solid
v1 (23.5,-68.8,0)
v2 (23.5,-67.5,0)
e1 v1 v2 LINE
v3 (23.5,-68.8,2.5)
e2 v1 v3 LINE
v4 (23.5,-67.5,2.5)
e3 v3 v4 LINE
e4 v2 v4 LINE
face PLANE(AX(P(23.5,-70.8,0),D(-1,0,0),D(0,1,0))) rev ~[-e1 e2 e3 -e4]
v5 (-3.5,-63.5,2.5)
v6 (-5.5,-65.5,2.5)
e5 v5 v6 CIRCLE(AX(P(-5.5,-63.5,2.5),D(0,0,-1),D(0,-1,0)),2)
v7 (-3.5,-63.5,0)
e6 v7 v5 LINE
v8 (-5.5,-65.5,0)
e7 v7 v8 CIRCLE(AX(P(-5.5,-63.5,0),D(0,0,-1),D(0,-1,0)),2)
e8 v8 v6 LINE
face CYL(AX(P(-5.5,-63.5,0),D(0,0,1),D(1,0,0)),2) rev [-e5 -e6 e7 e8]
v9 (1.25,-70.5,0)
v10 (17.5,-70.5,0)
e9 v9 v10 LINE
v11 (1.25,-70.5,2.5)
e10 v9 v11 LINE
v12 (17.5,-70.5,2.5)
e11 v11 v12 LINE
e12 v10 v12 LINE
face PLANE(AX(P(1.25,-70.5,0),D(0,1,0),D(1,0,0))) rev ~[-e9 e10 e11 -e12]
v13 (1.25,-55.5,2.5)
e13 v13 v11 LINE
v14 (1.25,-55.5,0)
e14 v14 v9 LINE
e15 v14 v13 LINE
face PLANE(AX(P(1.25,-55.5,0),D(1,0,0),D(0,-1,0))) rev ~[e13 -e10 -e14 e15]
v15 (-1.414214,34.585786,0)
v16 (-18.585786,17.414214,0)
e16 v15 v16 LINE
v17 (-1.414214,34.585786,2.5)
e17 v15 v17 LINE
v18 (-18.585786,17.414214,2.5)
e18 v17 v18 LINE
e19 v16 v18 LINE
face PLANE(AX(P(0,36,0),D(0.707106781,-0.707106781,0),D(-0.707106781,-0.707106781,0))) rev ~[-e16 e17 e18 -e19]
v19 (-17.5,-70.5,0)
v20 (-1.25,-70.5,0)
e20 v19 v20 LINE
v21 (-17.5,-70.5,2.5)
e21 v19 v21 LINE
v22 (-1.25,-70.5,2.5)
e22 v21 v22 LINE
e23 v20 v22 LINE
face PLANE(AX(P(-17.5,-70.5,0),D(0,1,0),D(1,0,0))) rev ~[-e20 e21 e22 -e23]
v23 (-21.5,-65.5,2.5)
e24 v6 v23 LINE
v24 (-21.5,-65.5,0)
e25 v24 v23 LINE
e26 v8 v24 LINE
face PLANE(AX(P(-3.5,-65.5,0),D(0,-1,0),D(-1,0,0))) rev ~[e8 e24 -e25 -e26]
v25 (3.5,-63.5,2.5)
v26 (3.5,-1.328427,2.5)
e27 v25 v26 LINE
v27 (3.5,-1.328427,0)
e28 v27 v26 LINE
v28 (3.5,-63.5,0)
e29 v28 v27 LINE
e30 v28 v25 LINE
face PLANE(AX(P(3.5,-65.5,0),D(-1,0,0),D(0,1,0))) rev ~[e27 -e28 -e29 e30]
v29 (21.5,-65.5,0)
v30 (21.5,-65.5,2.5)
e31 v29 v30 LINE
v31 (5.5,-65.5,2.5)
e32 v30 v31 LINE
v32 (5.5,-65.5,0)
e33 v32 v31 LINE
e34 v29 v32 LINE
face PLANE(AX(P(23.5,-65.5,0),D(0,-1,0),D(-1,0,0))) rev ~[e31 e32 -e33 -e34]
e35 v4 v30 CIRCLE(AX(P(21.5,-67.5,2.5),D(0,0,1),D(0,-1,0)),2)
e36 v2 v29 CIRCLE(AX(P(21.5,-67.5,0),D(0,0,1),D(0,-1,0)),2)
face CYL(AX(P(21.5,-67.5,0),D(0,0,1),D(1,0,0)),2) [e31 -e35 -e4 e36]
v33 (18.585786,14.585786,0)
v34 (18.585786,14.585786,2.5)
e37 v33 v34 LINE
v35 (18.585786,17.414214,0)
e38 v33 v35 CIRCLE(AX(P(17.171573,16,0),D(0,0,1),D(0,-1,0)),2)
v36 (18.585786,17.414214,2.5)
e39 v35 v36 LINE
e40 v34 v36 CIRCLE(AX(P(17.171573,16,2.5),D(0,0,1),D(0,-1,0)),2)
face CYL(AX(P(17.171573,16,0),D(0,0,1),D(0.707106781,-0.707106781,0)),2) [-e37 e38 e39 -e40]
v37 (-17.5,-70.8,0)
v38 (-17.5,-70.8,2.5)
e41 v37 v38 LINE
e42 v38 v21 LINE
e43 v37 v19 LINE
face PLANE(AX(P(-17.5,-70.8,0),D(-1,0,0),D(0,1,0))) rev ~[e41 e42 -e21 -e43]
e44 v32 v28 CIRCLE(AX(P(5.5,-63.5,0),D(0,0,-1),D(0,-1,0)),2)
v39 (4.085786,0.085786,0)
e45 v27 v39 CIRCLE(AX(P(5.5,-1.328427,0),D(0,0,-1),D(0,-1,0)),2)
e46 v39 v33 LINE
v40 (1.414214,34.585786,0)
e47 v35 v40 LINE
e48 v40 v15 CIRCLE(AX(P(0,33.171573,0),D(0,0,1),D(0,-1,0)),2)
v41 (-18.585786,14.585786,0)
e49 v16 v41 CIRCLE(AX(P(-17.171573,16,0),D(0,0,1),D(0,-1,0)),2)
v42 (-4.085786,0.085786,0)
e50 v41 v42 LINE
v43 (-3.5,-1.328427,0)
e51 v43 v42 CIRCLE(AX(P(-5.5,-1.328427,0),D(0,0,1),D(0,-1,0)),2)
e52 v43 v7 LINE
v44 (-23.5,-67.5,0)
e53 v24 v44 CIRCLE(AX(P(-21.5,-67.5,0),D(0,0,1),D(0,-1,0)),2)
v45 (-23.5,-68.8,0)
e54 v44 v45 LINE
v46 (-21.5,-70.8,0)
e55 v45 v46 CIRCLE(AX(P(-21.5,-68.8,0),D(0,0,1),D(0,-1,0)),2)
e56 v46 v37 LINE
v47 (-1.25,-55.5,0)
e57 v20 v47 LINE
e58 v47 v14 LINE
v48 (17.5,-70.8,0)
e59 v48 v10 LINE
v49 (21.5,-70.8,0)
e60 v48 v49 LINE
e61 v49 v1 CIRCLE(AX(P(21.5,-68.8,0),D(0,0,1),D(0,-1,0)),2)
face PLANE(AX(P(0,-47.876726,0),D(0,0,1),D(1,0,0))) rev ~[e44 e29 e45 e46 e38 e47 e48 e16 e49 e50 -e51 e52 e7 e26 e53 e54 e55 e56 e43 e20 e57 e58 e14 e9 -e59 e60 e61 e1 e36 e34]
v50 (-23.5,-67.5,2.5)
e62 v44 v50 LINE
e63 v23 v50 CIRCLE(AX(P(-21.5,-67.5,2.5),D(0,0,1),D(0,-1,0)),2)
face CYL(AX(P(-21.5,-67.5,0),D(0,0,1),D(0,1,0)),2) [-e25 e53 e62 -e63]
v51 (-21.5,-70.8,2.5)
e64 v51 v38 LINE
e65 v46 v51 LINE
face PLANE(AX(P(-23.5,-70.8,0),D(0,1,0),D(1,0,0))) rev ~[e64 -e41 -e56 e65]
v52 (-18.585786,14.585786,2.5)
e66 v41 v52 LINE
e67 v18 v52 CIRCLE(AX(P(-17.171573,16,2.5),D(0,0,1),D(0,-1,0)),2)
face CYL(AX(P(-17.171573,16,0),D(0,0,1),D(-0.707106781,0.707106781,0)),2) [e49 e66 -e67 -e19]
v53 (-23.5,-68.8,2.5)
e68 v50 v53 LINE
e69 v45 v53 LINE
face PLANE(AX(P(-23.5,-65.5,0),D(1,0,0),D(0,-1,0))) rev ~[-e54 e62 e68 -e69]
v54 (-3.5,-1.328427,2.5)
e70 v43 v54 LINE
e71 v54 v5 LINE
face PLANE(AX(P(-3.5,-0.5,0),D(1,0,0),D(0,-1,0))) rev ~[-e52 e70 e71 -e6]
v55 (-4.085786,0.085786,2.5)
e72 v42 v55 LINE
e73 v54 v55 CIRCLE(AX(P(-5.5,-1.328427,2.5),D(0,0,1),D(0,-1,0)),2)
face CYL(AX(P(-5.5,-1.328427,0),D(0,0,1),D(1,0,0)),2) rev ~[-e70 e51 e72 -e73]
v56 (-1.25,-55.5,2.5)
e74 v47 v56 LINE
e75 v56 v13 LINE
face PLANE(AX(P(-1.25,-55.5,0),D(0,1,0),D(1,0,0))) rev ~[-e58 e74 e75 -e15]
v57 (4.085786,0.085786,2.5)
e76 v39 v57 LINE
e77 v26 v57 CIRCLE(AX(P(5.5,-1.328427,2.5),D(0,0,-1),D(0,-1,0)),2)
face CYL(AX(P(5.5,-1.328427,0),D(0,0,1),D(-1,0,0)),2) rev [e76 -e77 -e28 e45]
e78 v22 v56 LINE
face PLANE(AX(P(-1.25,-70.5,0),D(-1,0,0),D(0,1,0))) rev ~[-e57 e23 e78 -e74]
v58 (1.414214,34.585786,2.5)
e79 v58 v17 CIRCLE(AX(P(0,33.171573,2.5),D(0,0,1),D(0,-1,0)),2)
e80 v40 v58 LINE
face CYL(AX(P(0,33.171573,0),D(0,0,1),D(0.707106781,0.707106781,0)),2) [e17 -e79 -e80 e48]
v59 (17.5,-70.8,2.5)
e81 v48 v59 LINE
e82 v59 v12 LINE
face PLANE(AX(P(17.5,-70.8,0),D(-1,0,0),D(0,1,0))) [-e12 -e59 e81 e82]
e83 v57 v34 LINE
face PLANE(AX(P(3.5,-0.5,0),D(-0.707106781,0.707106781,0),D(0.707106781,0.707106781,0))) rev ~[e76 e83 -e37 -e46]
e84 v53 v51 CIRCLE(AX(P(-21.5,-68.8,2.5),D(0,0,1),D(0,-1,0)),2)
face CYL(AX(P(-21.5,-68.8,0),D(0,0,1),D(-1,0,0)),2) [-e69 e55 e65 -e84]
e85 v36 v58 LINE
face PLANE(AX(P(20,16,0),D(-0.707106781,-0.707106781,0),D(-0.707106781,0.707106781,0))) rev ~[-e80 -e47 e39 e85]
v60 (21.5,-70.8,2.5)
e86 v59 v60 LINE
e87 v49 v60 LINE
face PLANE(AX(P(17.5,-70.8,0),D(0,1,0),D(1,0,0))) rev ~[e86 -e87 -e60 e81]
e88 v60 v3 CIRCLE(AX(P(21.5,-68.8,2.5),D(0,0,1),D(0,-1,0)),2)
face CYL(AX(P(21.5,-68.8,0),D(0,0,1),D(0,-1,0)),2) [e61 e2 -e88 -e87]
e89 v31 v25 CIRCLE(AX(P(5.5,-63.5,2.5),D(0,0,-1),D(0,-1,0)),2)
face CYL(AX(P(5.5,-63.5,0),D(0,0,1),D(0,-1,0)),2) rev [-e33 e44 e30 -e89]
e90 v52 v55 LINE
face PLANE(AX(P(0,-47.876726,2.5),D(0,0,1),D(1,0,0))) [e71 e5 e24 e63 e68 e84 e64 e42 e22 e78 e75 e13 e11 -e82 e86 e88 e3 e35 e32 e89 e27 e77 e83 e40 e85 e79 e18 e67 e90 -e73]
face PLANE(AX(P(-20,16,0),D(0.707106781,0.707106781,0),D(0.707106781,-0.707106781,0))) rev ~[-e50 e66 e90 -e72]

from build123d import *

# Parameters (mm, degrees)
F0_W     = 6
F0_H     = 0.3
F1_DEPTH = 2.5
F2_R     = 2


# Not quite as in the source:
# - a feature names something its author has since deleted; it is built from what else it names


with BuildPart() as f1:
    # F0 (on Top) → F1 (new body)
    with BuildSketch(Plane.XY):
        Polygon((0, -4), (-3.5, -0.5), (-3.5, -65.5), (-23.5, -65.5), (-23.5, -70.5), (-17.5, -70.5), (-1.25, -70.5), (-1.25, -55.5), (1.25, -55.5), (1.25, -70.5), (17.5, -70.5), (23.5, -70.5), (23.5, -65.5), (3.5, -65.5), (3.5, -0.5), align=None)
        with Locations((-20.5, -70.65)):
            Rectangle(F0_W, F0_H)
        with Locations((20.5, -70.65)):
            Rectangle(F0_W, F0_H)
        Polygon((-20, 16), (-3.5, -0.5), (0, -4), (3.5, -0.5), (20, 16), (0, 36), align=None)
    extrude(amount=F1_DEPTH)

    # F2
    f2_edges = [f1.edges().sort_by_distance(p)[0] for p in [
        (3.5, -65.5, 1.25),
        (-3.5, -65.5, 1.25),
        (-23.5, -65.5, 1.25),
        (23.5, -65.5, 1.25),
        (-23.5, -70.8, 1.25),
        (23.5, -70.8, 1.25),
        (20, 16, 1.25),
        (0, 36, 1.25),
        (-20, 16, 1.25),
        (3.5, -0.5, 1.25),
        (-3.5, -0.5, 1.25),
    ]]
    fillet(f2_edges, radius=F2_R)


solid = f1.part
